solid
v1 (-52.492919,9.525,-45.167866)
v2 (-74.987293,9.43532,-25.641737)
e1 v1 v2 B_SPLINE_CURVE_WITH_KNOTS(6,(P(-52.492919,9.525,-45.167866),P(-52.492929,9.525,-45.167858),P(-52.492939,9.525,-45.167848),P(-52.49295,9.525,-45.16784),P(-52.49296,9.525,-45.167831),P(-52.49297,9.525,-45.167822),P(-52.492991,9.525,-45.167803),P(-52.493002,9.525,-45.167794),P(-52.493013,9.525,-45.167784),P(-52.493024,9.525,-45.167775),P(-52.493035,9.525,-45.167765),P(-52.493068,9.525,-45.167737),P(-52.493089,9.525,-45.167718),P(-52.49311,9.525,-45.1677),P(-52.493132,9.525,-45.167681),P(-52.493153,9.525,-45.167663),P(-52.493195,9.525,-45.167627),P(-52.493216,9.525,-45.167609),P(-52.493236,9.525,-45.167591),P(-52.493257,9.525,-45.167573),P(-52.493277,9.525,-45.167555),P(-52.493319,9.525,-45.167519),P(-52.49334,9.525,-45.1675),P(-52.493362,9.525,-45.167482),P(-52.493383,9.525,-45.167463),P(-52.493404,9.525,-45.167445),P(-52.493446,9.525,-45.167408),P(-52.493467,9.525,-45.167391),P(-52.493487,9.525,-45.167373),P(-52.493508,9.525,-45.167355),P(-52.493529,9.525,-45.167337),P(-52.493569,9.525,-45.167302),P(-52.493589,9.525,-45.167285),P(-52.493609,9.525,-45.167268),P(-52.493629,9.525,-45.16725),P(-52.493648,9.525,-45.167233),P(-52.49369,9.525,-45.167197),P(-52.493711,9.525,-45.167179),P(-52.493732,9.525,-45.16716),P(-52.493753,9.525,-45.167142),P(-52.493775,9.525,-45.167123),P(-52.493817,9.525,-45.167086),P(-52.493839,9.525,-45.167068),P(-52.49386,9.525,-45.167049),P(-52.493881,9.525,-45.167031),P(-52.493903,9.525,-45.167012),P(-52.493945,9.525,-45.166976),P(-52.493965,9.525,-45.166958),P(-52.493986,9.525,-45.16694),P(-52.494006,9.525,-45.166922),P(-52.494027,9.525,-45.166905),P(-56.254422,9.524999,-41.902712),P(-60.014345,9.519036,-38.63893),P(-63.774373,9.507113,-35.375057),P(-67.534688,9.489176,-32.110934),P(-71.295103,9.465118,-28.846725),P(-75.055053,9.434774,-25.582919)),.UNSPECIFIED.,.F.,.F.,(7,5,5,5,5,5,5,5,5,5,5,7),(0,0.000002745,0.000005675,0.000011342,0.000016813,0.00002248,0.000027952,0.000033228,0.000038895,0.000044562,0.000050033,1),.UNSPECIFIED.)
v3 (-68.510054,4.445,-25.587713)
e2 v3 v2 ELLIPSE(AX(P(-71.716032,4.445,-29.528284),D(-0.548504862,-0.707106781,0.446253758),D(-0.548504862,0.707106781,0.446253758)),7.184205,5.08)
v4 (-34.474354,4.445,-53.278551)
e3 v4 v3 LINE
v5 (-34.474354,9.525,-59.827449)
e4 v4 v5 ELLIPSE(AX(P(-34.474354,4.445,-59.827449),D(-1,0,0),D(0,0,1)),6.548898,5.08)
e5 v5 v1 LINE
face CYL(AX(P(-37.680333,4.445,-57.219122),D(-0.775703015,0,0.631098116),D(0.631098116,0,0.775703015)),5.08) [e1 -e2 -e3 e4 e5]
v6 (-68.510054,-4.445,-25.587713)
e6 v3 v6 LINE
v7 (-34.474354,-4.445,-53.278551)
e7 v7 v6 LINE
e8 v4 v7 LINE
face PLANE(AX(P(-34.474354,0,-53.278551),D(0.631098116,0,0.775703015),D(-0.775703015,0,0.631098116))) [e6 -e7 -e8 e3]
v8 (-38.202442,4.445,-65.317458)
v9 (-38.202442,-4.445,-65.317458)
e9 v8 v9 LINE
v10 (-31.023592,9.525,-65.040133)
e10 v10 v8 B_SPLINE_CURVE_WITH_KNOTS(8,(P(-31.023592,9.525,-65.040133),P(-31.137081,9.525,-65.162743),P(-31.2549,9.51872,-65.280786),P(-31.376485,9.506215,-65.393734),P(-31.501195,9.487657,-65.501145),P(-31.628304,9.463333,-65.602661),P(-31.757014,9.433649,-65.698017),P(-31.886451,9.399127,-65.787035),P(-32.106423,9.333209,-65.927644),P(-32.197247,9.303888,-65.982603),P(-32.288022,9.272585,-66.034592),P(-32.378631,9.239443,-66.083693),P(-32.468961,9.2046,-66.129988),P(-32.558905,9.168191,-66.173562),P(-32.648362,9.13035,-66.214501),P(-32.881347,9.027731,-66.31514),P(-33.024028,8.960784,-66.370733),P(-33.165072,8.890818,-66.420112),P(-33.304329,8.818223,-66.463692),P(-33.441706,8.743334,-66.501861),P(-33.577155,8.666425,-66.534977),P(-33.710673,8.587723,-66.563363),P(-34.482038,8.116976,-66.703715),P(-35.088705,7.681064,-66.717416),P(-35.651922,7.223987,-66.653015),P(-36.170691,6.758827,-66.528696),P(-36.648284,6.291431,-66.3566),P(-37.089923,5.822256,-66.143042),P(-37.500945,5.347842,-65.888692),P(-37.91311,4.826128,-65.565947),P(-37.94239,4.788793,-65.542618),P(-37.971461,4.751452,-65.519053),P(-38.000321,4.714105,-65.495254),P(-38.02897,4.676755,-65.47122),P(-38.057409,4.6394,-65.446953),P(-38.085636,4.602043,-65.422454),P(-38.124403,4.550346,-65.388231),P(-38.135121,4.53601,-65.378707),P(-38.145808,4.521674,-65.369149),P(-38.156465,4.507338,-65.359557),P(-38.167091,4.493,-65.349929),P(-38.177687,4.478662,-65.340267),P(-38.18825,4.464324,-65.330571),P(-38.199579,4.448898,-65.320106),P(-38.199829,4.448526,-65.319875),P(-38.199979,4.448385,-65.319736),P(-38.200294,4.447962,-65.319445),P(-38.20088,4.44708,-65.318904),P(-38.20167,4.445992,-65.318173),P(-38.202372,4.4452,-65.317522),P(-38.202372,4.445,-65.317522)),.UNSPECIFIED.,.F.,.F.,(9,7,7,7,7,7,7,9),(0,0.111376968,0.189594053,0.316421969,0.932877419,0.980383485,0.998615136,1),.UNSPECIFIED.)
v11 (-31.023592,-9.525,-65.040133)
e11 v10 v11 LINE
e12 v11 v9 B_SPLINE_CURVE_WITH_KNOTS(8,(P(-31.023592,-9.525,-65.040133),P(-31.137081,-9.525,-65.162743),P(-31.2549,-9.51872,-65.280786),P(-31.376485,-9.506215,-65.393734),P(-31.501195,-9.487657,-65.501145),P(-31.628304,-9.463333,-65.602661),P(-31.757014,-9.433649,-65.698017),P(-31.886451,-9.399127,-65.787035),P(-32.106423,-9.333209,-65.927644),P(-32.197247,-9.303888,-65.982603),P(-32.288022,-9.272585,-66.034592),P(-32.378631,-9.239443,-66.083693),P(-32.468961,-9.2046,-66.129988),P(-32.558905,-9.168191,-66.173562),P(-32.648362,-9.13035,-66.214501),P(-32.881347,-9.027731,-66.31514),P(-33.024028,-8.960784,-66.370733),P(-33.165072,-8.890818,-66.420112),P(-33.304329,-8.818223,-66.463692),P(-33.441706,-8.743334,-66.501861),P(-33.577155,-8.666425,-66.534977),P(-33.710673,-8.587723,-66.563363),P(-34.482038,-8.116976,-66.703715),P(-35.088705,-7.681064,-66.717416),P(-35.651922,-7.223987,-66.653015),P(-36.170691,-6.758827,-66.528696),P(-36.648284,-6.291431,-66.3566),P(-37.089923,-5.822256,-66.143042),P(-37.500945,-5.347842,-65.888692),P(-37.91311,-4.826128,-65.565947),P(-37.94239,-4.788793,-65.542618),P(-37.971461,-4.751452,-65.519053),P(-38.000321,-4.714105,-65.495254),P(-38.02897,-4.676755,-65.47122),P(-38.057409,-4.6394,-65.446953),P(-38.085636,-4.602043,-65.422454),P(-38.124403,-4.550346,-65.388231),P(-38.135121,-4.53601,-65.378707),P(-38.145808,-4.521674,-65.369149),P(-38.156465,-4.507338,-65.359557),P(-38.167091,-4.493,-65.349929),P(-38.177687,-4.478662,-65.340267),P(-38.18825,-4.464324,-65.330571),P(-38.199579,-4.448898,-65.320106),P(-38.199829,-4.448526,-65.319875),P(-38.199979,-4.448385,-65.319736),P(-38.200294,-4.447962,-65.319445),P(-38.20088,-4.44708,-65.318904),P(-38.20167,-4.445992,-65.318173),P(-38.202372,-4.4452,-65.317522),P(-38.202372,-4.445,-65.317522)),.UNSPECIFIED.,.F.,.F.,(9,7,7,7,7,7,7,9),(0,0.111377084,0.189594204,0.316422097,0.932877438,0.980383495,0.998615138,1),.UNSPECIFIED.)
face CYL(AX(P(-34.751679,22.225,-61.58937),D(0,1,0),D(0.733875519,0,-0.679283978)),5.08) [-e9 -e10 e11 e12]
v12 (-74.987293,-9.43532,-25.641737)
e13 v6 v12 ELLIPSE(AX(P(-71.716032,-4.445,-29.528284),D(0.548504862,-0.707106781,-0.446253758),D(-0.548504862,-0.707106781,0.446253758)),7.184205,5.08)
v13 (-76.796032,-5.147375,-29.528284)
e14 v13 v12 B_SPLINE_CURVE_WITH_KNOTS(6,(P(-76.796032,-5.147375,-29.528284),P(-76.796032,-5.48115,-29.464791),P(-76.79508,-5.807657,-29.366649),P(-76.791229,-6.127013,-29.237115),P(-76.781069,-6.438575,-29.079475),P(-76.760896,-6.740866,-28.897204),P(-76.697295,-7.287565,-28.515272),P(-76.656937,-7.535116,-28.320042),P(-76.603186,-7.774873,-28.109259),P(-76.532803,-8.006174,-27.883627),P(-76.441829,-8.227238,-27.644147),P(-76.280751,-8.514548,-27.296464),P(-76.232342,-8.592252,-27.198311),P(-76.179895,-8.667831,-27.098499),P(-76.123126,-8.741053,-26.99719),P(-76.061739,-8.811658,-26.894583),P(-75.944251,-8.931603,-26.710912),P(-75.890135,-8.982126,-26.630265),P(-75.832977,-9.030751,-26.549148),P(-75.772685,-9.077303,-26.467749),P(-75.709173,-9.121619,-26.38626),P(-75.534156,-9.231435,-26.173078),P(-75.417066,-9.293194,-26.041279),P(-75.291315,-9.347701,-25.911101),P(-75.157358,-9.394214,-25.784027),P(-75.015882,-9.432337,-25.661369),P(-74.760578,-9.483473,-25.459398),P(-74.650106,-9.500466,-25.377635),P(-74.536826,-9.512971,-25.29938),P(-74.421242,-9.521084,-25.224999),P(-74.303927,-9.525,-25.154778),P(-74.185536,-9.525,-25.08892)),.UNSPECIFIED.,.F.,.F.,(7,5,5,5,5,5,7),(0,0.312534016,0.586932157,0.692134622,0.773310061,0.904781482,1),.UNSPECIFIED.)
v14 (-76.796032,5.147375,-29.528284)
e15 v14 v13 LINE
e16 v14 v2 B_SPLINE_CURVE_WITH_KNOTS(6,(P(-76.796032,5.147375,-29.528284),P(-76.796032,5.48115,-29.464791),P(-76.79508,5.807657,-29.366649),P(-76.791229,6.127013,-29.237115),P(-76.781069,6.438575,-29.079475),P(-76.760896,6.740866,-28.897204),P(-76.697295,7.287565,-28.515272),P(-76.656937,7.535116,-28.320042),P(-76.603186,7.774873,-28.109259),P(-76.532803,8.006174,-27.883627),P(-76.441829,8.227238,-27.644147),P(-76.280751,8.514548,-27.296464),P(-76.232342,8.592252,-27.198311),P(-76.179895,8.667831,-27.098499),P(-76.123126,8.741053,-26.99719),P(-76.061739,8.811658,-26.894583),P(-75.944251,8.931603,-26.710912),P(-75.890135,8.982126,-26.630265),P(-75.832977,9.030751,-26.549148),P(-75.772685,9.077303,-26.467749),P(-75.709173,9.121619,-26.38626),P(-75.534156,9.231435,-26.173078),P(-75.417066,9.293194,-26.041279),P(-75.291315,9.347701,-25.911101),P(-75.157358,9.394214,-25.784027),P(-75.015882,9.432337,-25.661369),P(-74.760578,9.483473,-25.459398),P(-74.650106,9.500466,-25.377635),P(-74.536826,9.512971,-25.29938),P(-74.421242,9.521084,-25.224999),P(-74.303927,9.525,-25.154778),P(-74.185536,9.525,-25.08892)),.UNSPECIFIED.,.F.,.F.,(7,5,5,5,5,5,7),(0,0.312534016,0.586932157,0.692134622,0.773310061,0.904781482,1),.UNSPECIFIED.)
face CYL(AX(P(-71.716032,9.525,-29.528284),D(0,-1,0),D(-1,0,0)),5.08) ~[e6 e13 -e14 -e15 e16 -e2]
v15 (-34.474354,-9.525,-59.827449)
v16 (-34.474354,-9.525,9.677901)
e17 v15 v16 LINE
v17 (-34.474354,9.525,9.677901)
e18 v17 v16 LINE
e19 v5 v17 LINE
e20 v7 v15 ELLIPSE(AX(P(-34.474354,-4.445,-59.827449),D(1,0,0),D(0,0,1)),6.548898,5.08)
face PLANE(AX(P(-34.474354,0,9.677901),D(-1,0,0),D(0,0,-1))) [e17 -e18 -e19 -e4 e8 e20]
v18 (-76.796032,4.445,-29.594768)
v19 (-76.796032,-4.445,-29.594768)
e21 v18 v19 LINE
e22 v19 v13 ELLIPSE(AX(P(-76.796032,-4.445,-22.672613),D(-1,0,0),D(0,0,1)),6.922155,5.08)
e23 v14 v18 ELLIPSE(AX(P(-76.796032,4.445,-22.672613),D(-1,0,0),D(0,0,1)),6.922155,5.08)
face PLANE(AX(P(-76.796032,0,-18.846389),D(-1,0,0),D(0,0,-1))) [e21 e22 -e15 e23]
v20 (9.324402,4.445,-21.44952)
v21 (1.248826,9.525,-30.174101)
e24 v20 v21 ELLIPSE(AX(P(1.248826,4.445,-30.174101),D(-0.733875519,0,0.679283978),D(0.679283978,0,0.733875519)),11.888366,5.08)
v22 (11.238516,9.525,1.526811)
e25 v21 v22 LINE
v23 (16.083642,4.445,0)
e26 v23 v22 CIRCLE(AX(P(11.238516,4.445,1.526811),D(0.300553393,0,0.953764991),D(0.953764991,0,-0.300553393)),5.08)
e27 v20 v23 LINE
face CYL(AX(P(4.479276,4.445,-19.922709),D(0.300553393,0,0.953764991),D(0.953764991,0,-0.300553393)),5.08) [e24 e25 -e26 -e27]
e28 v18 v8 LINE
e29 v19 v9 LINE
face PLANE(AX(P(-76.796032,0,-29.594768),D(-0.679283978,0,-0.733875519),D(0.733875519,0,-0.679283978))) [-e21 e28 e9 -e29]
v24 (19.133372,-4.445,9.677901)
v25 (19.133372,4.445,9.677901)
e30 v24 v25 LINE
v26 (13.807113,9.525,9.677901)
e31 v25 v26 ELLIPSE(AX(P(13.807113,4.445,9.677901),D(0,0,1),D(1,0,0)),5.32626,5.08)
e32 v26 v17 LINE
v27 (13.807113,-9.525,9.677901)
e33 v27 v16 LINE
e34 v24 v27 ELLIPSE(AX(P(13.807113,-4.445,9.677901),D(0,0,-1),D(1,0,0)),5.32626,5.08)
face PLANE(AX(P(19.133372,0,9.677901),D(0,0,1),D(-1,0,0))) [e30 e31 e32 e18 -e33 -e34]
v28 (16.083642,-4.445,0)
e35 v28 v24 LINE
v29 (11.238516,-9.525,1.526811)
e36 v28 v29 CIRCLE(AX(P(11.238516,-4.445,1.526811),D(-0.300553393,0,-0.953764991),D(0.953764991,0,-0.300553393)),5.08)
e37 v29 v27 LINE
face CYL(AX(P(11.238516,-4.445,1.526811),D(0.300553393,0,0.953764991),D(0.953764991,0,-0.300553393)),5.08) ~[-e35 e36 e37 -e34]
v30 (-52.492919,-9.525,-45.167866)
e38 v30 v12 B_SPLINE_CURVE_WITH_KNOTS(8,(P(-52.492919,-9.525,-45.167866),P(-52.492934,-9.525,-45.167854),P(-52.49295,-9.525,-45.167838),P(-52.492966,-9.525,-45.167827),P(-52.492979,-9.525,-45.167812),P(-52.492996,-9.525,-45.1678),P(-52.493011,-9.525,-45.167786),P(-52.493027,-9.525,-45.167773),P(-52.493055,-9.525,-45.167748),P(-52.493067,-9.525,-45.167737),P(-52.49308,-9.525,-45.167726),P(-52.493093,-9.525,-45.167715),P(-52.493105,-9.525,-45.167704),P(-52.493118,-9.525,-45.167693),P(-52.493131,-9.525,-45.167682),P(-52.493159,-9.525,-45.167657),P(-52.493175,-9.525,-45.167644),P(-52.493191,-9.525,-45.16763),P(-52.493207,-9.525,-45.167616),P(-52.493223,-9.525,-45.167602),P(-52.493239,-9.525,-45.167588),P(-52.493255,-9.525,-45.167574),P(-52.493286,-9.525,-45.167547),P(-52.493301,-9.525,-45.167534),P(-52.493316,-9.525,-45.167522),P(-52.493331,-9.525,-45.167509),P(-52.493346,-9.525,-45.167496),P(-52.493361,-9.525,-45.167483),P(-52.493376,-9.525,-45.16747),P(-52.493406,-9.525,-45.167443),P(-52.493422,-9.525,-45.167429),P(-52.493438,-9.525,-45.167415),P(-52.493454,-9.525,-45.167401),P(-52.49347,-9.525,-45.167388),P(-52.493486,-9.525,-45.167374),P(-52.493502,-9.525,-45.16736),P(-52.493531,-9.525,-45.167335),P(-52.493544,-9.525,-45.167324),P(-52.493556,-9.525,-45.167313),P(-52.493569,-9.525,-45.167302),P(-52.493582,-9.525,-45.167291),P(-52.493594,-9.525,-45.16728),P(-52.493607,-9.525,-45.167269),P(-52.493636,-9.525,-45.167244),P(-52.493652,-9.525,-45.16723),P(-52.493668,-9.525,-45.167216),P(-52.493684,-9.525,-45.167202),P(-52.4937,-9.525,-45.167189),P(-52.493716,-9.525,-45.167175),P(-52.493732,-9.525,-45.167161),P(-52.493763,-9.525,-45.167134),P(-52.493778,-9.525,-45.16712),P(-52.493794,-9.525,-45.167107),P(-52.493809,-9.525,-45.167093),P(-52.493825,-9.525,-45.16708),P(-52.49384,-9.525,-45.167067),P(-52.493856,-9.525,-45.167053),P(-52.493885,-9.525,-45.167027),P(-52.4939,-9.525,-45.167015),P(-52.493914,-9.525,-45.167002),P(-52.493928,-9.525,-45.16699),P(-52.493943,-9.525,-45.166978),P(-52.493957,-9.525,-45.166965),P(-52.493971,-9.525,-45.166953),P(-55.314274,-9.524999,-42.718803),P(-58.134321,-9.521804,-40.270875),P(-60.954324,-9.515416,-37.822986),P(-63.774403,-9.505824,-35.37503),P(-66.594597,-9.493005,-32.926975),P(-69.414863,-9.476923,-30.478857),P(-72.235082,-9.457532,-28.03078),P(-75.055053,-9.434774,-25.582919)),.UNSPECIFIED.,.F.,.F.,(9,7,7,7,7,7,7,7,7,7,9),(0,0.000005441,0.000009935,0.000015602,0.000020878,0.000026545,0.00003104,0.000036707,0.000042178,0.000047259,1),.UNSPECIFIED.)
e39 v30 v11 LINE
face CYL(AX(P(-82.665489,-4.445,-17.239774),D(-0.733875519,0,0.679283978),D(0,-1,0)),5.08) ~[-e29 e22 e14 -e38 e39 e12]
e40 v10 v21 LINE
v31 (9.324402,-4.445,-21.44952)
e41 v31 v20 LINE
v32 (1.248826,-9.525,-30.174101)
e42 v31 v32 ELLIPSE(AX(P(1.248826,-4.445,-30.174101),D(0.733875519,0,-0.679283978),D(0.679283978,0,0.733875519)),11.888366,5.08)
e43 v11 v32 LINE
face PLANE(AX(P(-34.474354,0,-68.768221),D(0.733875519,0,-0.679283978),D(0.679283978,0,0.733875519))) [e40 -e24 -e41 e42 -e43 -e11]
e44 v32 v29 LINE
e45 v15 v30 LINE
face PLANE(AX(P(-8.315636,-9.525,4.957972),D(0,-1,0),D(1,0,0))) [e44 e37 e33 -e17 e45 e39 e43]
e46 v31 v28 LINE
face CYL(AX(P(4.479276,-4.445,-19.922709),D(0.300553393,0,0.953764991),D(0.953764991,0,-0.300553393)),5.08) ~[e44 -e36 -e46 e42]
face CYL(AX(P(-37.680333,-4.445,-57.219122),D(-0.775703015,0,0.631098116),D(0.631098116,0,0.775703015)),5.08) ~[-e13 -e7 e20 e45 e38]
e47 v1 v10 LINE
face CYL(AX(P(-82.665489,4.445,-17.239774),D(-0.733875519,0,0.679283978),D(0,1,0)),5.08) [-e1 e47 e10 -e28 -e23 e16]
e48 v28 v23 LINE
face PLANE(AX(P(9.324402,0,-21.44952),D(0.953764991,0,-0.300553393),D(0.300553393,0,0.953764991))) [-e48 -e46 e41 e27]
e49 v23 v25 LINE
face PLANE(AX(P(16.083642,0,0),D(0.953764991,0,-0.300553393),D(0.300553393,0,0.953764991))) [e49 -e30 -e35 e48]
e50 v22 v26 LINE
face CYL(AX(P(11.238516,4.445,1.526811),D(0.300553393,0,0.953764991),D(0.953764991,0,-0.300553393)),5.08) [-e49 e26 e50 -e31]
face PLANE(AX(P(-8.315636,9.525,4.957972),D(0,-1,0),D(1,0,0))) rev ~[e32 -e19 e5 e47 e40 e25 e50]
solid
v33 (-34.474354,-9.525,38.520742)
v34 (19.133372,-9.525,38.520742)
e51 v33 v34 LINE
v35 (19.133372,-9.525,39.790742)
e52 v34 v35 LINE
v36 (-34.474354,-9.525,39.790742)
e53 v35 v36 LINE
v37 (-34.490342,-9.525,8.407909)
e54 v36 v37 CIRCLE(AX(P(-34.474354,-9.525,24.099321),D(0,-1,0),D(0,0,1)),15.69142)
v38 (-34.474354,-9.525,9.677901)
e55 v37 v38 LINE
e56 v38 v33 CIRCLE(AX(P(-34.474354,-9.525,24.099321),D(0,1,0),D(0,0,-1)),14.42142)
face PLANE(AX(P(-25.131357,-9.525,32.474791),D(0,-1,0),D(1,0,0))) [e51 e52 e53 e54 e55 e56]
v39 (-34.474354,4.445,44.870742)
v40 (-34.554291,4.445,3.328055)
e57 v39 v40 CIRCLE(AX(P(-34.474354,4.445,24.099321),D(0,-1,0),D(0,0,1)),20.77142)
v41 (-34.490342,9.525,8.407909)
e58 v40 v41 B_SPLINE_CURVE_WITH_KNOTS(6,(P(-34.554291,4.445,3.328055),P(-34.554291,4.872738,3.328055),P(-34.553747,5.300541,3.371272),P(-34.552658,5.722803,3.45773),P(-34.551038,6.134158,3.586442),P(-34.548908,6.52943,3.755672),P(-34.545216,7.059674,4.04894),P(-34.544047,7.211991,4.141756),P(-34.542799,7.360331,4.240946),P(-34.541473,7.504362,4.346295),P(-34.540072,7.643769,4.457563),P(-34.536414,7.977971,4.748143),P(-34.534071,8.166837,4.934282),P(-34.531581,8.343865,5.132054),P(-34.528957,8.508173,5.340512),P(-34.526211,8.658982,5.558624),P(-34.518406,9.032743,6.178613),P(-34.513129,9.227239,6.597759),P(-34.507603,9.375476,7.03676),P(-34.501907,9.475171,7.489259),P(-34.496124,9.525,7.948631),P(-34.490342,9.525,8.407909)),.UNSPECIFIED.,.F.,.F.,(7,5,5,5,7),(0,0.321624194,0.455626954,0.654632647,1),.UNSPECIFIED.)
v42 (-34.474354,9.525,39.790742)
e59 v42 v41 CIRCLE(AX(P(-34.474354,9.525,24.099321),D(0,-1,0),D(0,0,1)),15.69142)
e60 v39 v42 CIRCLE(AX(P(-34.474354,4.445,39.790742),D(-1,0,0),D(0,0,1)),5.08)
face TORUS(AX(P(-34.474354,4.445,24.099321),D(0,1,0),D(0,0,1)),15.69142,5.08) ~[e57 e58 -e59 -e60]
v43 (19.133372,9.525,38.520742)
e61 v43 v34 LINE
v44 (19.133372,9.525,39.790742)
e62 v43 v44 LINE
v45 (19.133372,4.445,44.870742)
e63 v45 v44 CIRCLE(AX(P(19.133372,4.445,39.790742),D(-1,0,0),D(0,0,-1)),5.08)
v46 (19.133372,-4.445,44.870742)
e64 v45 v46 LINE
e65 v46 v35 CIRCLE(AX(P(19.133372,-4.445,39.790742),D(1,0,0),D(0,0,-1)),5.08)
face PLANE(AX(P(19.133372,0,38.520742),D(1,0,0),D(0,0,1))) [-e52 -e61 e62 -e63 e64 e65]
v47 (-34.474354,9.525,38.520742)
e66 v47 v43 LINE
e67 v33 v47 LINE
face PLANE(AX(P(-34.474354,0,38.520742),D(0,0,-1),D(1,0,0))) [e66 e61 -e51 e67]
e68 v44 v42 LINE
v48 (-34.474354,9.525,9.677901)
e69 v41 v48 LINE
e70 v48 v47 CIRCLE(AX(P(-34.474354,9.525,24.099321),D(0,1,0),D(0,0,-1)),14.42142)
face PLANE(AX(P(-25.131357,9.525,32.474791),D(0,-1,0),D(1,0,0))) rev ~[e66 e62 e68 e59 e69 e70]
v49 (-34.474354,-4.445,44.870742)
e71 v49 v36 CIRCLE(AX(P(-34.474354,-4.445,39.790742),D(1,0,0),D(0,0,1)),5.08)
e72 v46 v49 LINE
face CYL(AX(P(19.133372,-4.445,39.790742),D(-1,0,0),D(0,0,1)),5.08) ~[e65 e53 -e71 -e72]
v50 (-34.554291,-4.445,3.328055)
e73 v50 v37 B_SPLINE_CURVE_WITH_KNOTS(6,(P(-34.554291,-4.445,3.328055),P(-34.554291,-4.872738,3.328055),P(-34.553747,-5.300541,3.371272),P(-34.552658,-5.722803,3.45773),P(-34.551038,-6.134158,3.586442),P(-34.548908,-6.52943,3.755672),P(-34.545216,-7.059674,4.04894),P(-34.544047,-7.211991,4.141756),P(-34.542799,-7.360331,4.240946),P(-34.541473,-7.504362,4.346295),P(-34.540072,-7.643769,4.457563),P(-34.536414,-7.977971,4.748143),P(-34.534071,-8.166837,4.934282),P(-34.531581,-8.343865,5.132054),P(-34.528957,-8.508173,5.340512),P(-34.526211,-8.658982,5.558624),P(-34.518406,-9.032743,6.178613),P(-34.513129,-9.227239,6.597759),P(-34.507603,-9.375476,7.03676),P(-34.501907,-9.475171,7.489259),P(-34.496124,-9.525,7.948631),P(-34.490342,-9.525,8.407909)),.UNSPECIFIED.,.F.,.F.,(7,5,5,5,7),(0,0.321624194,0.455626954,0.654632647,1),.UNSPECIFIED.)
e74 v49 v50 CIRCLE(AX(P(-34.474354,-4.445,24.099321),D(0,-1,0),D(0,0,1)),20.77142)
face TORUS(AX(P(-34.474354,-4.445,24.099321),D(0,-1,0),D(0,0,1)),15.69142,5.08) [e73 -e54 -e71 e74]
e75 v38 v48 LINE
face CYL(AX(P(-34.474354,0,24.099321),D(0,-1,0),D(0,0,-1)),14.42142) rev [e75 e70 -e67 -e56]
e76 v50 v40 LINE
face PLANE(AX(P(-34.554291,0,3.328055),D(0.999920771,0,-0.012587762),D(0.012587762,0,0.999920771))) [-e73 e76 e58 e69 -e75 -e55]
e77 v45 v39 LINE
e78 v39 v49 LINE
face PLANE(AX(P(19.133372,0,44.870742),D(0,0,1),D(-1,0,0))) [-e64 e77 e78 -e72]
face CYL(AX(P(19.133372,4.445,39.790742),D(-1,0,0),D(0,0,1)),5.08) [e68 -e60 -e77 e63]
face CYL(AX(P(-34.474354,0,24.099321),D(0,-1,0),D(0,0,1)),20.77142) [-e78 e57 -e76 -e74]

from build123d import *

# Parameters (mm, degrees)
F1_DEPTH    = 9.525
F2_R        = 5.08
F2_2_R      = 5.08
F3_T1_DEPTH = 44.45
F3_T3_DEPTH = 83.0687423867


# Not quite as in the source:
# - a fillet or chamfer that OpenCascade refuses, or shapes differently, is made with other operations: its cross-section is extruded or revolved along the edge and cut away or added


with BuildPart() as f1:
    # F0 (on Front) → F1 (new body, symmetric)
    with BuildSketch(Plane.XZ):
        Polygon((19.1333722323, 9.6779013216), (-34.4743542373, 9.6779013216), (-34.4743542373, 0), (16.0836418411, 0), align=None)
        Polygon((9.3244023705, -21.4495198637), (-34.4743542373, -21.4495198637), (-34.4743542373, -53.2785505056), (-34.4743542373, -68.7682205643), align=None)
        Polygon((-34.4743542373, -68.7682205643), (-34.4743542373, -53.2785505056), (-76.7960324883, -18.846389095), (-76.7960324883, -29.5947678383), align=None)
        Polygon((16.0836418411, 0), (-34.4743542373, 0), (-34.4743542373, -21.4495198637), (9.3244023705, -21.4495198637), align=None)
    extrude(amount=F1_DEPTH, both=True)

    # F2#2
    f2_2_edges = [f1.edges().sort_by_distance(p)[0] for p in [
        (-55.635193, -9.525, -36.06247),
        (-76.796032, 0, -18.846389),
        (-55.635193, 9.525, -36.06247),
        (14.228887, -9.525, -5.885809),
        (14.228887, 9.525, -5.885809),
    ]]
    fillet(f2_2_edges, radius=F2_2_R)

    # F3: fillet of radius 5.08 on 4 edges, made by hand

    # F3_s2 → F3_t1 (cut)
    with BuildSketch(Plane.XZ.offset(-22.225)):
        with BuildLine():
            ThreePointArc((-31.0235916298, -65.0401329276), (-34.5555808578, -66.6655840089), (-38.202441874, -65.3174579569))
            Line((-38.202441874, -65.3174579569), (-34.4743542373, -68.7682205643))
            Line((-34.4743542373, -68.7682205643), (-31.0235916298, -65.0401329276))
        make_face()
    extrude(amount=F3_T1_DEPTH, mode=Mode.SUBTRACT)

    # F3_s4 → F3_t3 (cut)
    with BuildSketch(Plane(origin=(-35.9272257857, 0, 33.2546708697), x_dir=(0, 1, 0), z_dir=(0.733875519, 0, -0.6792839778))):
        with BuildLine():
            ThreePointArc((-9.525, -68.8051900398), (-8.0371024484, -72.3972924882), (-4.445, -73.8851900398))
            Line((-4.445, -73.8851900398), (-9.525, -73.8851900398))
            Line((-9.525, -73.8851900398), (-9.525, -68.8051900398))
        make_face()
        with BuildLine():
            ThreePointArc((9.525, -68.8051900398), (8.0371024484, -72.3972924882), (4.445, -73.8851900398))
            Line((4.445, -73.8851900398), (9.525, -73.8851900398))
            Line((9.525, -73.8851900398), (9.525, -68.8051900398))
        make_face()
    extrude(amount=F3_T3_DEPTH, mode=Mode.SUBTRACT)


with BuildPart() as f1b:
    # F0 (on Front) → F1, piece 2 (new body, symmetric)
    with BuildSketch(Plane.XZ):
        with BuildLine():
            Line((-34.4743542373, 38.5207416654), (19.1333722323, 38.5207416654))
            Line((19.1333722323, 38.5207416654), (19.1333722323, 44.8707416654))
            Line((19.1333722323, 44.8707416654), (-34.4743542373, 44.8707416654))
            ThreePointArc((-34.4743542373, 44.8707416654), (-55.2457359555, 24.1392899111), (-34.5542909246, 3.3280551363))
            Line((-34.5542909246, 3.3280551363), (-34.4743542373, 9.6779013216))
            ThreePointArc((-34.4743542373, 9.6779013216), (-48.8957744092, 24.0993214935), (-34.4743542373, 38.5207416654))
        make_face()
    extrude(amount=F1_DEPTH, both=True)

    # F2
    f2_edges = [f1b.edges().sort_by_distance(p)[0] for p in [
        (-7.670491, -9.525, 44.870742),
        (-7.670491, 9.525, 44.870742),
    ]]
    fillet(f2_edges, radius=F2_R)


solid = Compound([f1.part, f1b.part])
